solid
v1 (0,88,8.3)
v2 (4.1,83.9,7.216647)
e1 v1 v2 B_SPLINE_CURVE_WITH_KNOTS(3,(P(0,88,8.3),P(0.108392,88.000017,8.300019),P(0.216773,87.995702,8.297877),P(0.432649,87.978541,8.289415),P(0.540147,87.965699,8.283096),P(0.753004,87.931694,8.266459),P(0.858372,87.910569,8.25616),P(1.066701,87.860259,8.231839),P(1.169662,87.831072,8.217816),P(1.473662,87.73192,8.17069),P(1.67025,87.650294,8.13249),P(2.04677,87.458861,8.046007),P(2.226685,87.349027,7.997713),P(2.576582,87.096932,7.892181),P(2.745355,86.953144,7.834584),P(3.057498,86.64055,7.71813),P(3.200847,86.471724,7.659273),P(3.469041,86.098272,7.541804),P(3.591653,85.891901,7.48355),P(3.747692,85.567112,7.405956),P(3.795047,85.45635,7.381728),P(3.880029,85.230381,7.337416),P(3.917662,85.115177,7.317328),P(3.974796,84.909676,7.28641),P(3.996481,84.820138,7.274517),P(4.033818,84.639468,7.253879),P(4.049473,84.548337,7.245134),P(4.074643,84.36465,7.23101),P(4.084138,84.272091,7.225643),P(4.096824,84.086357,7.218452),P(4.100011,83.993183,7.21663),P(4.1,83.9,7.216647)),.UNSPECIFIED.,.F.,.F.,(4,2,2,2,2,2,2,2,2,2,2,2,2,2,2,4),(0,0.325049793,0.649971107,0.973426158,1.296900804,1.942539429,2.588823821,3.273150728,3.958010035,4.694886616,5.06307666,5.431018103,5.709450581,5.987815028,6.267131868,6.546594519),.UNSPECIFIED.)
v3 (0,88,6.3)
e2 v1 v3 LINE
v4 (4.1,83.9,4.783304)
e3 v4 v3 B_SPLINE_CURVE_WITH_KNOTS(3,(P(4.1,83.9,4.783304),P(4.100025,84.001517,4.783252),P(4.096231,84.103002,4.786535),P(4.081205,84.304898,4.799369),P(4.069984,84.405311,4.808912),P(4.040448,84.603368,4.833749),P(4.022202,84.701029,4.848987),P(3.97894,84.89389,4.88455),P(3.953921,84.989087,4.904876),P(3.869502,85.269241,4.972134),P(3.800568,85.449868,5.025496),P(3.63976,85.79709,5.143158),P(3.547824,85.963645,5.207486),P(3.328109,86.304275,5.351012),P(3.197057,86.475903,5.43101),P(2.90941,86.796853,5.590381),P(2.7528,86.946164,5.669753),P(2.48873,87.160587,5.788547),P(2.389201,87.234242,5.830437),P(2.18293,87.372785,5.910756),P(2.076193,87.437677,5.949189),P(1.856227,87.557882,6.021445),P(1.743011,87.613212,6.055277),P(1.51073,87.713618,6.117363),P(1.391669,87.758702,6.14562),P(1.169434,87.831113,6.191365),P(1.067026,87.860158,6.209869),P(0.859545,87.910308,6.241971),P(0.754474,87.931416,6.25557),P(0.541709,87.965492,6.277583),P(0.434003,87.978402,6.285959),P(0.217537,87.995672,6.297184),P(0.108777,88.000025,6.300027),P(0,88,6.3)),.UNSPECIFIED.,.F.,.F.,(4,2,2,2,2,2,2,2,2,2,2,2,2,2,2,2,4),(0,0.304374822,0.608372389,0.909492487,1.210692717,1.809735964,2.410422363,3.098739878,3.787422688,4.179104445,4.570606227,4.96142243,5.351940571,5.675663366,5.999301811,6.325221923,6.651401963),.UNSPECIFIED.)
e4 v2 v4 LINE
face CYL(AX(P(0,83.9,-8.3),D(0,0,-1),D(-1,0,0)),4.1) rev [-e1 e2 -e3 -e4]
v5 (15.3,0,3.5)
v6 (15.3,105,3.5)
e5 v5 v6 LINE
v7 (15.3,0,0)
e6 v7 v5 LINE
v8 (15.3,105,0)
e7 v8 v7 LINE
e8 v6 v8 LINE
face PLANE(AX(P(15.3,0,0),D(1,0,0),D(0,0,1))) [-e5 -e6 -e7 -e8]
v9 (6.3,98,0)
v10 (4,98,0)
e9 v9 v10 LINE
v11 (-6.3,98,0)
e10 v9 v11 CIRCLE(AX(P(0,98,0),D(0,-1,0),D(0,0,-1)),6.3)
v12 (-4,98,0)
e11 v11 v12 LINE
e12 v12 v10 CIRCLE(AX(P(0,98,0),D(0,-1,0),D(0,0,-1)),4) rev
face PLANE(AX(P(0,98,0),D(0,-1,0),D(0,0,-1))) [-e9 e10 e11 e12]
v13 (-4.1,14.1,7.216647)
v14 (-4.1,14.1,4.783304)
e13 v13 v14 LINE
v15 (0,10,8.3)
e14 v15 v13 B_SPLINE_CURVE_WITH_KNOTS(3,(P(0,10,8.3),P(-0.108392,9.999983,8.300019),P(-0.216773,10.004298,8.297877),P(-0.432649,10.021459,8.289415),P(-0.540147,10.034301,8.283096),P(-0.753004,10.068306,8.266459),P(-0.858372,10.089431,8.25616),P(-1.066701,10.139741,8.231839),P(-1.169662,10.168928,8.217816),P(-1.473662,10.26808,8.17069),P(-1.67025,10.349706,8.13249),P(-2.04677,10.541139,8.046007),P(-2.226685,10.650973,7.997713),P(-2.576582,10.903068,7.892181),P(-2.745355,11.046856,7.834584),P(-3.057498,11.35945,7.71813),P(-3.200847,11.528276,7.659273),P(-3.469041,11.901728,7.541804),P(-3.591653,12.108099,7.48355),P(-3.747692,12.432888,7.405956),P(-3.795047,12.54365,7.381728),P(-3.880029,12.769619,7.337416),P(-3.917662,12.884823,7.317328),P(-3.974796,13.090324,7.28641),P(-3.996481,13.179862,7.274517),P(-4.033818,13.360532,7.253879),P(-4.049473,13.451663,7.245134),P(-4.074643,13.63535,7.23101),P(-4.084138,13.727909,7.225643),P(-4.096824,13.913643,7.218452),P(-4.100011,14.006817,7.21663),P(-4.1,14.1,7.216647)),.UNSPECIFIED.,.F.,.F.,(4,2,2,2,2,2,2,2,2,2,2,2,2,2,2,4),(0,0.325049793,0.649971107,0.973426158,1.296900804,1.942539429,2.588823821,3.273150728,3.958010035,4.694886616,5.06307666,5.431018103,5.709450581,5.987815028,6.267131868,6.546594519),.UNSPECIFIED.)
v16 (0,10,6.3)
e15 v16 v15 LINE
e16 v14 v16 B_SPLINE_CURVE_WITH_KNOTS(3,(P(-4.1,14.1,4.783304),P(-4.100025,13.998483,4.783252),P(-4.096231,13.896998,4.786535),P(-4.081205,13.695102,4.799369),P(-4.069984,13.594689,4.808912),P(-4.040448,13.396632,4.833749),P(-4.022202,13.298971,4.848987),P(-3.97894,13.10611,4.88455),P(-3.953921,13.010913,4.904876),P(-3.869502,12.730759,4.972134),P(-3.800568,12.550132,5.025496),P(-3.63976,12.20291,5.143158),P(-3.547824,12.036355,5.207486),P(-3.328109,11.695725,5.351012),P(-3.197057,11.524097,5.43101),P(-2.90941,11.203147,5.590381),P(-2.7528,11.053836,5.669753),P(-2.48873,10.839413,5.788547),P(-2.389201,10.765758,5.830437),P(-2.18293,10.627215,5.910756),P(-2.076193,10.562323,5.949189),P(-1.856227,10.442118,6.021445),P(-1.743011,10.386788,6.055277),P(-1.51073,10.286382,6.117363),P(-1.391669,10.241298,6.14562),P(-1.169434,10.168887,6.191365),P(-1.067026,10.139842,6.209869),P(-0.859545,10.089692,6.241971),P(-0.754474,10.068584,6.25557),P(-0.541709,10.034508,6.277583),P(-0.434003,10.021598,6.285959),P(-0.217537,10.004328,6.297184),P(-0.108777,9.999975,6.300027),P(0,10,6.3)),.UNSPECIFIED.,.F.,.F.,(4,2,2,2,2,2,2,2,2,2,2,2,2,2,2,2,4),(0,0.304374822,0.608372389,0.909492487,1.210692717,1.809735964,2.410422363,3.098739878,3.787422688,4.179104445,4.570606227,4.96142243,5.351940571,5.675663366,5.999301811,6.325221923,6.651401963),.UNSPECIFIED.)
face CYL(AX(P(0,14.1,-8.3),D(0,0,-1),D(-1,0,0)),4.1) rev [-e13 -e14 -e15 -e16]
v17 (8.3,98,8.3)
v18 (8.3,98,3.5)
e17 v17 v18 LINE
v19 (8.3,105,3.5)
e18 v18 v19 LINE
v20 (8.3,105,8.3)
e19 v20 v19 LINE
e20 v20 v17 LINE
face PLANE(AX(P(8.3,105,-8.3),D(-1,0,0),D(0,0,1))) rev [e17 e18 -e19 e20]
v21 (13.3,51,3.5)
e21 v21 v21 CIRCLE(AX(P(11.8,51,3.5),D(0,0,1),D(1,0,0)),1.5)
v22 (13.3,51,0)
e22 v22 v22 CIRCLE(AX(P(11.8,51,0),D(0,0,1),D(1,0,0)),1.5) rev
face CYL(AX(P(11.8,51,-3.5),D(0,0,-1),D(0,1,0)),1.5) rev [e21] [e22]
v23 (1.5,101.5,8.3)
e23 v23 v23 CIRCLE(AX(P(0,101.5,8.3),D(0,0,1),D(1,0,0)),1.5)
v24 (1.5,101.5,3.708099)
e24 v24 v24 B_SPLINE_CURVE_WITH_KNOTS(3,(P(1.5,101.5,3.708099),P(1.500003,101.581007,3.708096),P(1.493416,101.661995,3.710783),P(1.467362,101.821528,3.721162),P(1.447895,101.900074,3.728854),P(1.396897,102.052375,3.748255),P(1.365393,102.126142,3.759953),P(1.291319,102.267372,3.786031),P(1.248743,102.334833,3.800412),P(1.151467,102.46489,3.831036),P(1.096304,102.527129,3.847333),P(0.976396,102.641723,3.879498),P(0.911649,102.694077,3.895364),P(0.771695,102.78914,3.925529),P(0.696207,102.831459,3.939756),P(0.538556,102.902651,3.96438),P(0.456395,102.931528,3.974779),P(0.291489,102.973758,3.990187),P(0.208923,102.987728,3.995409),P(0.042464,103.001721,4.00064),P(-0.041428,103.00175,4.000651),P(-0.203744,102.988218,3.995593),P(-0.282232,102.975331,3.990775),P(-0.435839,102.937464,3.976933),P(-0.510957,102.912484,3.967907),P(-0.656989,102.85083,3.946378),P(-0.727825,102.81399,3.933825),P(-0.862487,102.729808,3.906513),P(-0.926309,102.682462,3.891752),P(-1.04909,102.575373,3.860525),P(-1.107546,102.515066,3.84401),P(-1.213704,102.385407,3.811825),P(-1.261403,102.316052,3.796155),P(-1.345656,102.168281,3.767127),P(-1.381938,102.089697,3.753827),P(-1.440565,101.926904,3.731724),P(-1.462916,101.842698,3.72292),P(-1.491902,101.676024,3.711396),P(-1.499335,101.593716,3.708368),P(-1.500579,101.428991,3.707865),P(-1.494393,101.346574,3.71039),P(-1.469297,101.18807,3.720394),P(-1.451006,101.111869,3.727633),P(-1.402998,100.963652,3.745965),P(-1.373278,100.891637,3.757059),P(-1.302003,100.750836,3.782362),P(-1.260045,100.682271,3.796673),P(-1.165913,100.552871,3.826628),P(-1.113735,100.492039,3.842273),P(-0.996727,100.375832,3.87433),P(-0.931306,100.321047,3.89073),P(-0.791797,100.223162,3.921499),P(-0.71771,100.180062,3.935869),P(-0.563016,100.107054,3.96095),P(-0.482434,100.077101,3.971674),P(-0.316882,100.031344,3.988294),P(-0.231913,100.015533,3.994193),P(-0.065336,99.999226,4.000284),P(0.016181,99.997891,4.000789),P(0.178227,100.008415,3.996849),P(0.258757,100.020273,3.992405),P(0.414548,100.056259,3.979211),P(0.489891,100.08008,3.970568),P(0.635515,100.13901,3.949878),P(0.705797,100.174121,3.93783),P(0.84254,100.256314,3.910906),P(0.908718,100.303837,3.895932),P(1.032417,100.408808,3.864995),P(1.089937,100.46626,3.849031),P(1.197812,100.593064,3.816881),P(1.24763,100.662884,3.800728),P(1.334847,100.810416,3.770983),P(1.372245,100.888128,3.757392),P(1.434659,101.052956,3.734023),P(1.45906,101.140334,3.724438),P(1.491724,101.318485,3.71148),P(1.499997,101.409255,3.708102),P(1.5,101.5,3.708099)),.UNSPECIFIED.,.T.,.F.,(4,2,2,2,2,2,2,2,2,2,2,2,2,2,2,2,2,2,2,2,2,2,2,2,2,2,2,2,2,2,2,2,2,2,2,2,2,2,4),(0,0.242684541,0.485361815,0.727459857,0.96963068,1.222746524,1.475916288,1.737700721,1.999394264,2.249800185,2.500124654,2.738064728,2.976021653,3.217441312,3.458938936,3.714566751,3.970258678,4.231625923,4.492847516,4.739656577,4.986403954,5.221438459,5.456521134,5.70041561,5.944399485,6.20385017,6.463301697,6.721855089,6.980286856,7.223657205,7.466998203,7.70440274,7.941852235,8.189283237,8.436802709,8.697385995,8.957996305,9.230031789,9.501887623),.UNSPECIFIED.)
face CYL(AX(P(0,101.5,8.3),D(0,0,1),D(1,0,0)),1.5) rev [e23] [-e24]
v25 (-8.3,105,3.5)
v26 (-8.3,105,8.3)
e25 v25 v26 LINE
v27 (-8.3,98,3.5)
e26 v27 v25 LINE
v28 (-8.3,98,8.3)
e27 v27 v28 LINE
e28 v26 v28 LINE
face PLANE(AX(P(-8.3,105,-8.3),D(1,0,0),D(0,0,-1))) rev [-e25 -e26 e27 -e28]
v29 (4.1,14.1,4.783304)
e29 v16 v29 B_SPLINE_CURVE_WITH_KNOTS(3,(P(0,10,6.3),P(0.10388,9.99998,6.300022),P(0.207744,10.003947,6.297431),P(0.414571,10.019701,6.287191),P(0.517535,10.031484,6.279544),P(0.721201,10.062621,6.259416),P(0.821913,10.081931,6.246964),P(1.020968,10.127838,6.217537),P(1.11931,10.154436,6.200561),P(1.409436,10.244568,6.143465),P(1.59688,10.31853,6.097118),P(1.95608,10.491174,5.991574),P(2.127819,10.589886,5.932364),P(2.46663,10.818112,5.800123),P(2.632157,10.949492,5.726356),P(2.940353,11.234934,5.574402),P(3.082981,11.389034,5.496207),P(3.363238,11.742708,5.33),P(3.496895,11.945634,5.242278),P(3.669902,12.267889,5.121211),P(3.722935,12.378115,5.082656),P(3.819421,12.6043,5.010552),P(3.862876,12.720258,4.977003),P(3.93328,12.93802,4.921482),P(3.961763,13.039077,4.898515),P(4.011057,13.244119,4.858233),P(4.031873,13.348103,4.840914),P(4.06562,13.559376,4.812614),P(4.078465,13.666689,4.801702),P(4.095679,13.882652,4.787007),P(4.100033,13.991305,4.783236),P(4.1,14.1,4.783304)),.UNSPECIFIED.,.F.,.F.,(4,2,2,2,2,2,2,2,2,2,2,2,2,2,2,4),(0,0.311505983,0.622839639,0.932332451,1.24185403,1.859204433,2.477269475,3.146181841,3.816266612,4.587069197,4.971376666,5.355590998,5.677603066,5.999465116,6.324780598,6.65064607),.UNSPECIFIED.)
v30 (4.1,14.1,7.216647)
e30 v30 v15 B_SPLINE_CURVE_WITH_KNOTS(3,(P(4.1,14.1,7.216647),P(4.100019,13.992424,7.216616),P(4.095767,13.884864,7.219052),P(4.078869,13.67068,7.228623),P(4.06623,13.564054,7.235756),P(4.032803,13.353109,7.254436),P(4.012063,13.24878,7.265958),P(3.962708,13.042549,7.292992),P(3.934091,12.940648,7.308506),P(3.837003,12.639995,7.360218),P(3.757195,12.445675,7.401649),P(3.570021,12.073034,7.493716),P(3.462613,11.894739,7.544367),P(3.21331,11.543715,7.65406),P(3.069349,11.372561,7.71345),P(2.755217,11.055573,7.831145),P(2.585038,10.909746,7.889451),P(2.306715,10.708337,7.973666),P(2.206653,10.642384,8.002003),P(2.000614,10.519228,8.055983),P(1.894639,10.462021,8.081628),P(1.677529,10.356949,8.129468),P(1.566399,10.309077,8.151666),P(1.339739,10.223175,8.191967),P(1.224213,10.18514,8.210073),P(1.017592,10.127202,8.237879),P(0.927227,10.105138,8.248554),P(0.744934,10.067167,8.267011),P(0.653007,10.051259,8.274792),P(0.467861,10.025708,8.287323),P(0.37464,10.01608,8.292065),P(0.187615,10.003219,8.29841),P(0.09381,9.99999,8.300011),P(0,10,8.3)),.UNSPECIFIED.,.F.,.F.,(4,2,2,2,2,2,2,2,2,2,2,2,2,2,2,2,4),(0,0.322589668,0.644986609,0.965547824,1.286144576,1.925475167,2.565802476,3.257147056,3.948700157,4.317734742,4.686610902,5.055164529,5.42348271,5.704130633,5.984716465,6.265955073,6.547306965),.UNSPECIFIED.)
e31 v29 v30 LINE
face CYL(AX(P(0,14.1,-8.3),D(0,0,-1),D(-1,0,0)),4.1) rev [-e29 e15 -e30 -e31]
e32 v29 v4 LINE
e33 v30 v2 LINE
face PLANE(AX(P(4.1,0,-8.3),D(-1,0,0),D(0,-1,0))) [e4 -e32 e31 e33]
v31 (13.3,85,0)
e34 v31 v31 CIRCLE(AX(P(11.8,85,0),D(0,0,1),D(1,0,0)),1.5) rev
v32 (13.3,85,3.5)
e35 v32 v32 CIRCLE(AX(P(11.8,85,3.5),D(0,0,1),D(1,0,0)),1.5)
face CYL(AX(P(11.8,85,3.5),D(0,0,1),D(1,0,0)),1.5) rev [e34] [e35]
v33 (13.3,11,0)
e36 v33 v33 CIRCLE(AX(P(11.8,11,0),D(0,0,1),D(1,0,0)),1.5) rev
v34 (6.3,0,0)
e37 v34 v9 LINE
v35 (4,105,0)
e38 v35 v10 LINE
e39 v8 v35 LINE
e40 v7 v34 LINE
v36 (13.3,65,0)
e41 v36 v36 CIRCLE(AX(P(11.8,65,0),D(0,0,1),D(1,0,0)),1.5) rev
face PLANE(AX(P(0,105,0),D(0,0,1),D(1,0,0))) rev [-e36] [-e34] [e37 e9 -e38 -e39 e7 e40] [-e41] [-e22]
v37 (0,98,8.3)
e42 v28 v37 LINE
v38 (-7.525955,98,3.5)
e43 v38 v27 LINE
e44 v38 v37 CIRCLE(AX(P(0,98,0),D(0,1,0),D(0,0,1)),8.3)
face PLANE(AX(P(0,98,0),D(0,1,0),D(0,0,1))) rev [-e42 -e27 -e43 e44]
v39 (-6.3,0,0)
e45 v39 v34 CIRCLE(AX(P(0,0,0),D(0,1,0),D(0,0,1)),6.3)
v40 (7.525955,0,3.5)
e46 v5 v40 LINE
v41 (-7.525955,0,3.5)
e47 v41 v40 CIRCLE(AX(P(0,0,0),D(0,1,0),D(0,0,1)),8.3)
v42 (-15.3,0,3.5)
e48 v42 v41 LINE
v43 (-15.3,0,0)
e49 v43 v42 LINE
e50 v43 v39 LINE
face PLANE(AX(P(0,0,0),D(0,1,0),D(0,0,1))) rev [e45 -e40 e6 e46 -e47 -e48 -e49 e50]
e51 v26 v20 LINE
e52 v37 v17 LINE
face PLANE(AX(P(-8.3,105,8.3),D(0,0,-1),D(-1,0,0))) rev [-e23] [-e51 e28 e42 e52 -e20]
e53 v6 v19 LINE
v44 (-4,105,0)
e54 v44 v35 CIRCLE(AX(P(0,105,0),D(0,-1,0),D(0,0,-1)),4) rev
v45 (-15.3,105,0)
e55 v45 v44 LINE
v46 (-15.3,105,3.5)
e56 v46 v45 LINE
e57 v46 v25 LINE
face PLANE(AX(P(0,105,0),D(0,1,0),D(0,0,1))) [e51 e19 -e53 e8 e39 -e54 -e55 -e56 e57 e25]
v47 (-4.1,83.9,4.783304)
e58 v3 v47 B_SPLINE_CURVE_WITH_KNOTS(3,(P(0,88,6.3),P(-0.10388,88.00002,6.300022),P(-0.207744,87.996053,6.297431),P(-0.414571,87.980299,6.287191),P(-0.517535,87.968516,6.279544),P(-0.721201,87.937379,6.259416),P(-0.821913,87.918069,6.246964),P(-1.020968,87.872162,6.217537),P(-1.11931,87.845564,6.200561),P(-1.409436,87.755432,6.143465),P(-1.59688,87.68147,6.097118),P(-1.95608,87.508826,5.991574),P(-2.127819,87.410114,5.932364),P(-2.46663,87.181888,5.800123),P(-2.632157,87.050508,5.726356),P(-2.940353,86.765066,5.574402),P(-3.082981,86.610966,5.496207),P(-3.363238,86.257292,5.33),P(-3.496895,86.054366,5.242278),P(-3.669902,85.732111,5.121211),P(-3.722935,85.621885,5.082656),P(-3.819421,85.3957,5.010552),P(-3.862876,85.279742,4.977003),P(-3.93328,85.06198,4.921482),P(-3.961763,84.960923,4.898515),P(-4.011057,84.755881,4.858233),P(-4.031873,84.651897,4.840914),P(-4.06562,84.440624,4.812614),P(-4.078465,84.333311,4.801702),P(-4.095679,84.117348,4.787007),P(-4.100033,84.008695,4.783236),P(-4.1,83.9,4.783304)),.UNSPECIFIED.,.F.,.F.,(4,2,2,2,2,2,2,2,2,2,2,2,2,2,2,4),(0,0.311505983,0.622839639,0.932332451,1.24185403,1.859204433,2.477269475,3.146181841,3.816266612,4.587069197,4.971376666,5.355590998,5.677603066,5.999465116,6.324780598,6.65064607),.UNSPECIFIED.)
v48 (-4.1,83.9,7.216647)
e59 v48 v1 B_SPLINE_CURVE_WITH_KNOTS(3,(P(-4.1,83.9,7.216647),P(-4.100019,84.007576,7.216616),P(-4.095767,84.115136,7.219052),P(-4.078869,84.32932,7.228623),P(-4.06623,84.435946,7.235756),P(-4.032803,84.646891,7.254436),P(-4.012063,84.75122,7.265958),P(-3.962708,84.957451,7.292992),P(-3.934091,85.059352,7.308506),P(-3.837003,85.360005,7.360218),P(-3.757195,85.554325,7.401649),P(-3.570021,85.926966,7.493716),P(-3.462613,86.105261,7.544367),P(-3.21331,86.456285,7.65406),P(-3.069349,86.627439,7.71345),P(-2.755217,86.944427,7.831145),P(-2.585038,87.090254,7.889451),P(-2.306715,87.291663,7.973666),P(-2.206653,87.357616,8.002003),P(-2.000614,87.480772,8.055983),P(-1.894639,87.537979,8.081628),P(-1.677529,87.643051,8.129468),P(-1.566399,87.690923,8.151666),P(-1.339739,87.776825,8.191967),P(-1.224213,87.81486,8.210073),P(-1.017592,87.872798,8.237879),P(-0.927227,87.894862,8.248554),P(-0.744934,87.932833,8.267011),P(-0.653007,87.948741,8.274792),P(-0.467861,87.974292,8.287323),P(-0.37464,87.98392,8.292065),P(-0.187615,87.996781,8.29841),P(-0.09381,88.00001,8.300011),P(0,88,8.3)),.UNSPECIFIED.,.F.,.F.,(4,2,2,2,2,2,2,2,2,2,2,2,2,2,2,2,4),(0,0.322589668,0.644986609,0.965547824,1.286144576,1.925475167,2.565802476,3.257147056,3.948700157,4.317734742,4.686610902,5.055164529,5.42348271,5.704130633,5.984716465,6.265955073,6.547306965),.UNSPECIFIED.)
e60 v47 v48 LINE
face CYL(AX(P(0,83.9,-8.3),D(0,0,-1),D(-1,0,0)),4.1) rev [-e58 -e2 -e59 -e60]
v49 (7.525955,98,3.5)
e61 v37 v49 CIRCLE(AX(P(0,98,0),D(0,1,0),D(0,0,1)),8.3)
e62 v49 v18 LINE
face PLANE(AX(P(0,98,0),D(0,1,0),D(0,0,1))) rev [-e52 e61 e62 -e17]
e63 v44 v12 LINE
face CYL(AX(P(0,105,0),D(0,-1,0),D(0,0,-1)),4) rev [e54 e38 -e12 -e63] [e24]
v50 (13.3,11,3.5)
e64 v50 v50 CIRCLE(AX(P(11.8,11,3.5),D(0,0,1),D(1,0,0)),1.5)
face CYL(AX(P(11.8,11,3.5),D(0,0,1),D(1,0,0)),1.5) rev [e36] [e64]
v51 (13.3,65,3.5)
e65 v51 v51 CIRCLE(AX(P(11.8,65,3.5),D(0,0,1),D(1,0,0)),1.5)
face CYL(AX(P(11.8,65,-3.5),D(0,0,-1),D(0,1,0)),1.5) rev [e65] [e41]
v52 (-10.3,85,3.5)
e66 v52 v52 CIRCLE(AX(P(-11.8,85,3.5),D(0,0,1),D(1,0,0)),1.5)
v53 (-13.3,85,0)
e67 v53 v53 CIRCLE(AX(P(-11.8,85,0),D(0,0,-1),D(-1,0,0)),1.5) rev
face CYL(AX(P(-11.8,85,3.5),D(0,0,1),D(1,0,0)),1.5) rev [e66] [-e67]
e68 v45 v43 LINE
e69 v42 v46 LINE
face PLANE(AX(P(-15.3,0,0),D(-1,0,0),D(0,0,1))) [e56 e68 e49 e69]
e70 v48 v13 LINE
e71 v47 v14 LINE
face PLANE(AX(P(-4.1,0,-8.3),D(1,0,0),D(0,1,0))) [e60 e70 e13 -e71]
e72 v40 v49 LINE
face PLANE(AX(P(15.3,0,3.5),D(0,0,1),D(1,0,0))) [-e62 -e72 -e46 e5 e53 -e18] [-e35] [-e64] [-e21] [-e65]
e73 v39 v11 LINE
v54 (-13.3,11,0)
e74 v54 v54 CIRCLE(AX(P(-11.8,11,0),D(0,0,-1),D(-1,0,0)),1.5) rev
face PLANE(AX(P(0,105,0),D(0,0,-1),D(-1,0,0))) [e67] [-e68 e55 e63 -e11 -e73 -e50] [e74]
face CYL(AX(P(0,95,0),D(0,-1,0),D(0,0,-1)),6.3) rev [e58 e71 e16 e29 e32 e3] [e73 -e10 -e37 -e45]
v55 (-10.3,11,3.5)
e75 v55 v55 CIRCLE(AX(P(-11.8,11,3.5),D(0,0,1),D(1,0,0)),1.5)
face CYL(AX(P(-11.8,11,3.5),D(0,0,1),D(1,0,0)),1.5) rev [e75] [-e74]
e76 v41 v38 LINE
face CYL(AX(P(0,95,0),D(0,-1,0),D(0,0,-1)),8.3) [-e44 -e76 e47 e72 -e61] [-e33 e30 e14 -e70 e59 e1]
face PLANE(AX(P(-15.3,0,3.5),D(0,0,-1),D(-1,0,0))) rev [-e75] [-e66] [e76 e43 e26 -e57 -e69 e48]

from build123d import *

# Parameters (mm, degrees)
SKETCH1_R                = 8.3
SKETCH1_R_2              = 6.3
BOSS_EXTRUDE1_DEPTH      = 95
SKETCH3_R                = 8.3
BOSS_EXTRUDE2_DEPTH      = 3
SKETCH5_W                = 16.6
SKETCH5_H                = 16.6
BOSS_EXTRUDE4_DEPTH      = 7
CUT_EXTRUDE1_DEPTH       = 107.627623063
FILLET1_R                = 4.1
SKETCH4_R                = 6.3
SKETCH4_R_2              = 1.5
CUT_EXTRUDE3_DEPTH       = 3
BOSS_EXTRUDE6_START      = 2
SKETCH8_R                = 1.5
BOSS_EXTRUDE6_DEPTH      = 2
BOSS_EXTRUDE7_START      = -0.774045
BOSS_EXTRUDE7_DEPTH      = 7.774045
F_3_0_3_DIAMETER_HOLE1_D = 3
F_3_0_3_DIAMETER_HOLE2_D = 3
F_3_0_3_DIAMETER_HOLE3_D = 3
CUT_EXTRUDE4_START       = -105
CUT_EXTRUDE4_DEPTH       = 105


# Read off the part's stored shape, not the designer's step: Cut-Extrude4
with BuildPart() as part:
    # Sketch1 → Boss-Extrude1 (new body)
    with BuildSketch(Plane(origin=(0, 0, 0), x_dir=(1, 0, 0), z_dir=(0, 1, 0))):
        with Locations(Location((0, 0, 0), (0, 0, 270))):
            Circle(SKETCH1_R)
        with Locations(Location((0, 0, 0), (0, 0, 270))):
            Circle(SKETCH1_R_2, mode=Mode.SUBTRACT)
    extrude(amount=BOSS_EXTRUDE1_DEPTH)

    # Sketch3 → Boss-Extrude2 (add)
    with BuildSketch(Plane(origin=(0, 95, 0), x_dir=(1, 0, 0), z_dir=(0, 1, 0))):
        with Locations(Location((0, 0, 0), (0, 0, 270))):
            Circle(SKETCH3_R)
    extrude(amount=BOSS_EXTRUDE2_DEPTH)

    # Sketch5 → Boss-Extrude4 (add)
    with BuildSketch(Plane(origin=(0, 98, 0), x_dir=(1, 0, 0), z_dir=(0, 1, 0))):
        Rectangle(SKETCH5_W, SKETCH5_H)
    extrude(amount=BOSS_EXTRUDE4_DEPTH)

    # Sketch6 → Cut-Extrude1 (cut, through all)
    with BuildSketch(Plane.XY.offset(8.3)):
        Polygon((4.1, 10), (0, 10), (-4.1, 10), (-4.1, 88), (4.1, 88), align=None)
    extrude(amount=-CUT_EXTRUDE1_DEPTH, mode=Mode.SUBTRACT)

    # Fillet1
    fillet1_edges = [part.edges().sort_by_distance(p)[0] for p in [
        (4.1, 88, 5.999975859),
        (4.1, 88, -5.999975859),
        (-4.1, 88, 5.999975859),
        (-4.1, 88, -5.999975859),
        (4.1, 10, -5.999975859),
        (4.1, 10, 5.999975859),
        (-4.1, 10, -5.999975859),
        (-4.1, 10, 5.999975859),
    ]]
    fillet(fillet1_edges, radius=FILLET1_R - 0.0001)  # a hair under: the kernel refuses the full size

    # Sketch4 → Cut-Extrude3 (cut)
    with BuildSketch(Plane(origin=(0, 95, 0), x_dir=(-1, 0, 0), z_dir=(0, -1, 0))):
        with Locations(Location((0, 0, 0), (0, 0, 90))):
            Circle(SKETCH4_R)
        with Locations(Location((0, 0, 0), (0, 0, 90))):
            Circle(SKETCH4_R_2, mode=Mode.SUBTRACT)
    extrude(amount=-CUT_EXTRUDE3_DEPTH, mode=Mode.SUBTRACT)

    # Sketch8 → Boss-Extrude6 (add)
    with BuildSketch(Plane(origin=(0, 95, 0), x_dir=(-1, 0, 0), z_dir=(0, -1, 0)).offset(BOSS_EXTRUDE6_START)):
        with Locations(Location((0, 0, 0), (0, 0, 90))):
            Circle(SKETCH8_R)
    extrude(amount=-BOSS_EXTRUDE6_DEPTH)

    # Sketch9 → Boss-Extrude7 (add)
    with BuildSketch(Plane.ZY.offset(8.3).offset(BOSS_EXTRUDE7_START)):
        Polygon((0, 0), (3.5, 0), (3.5, 105), (-3.5, 105), (-3.5, 0), align=None)
    boss_extrude7 = extrude(amount=BOSS_EXTRUDE7_DEPTH)

    # Mirror1: Boss-Extrude7 across plane
    add(boss_extrude7.mirror(Plane(origin=(0, 0, 0), x_dir=(0, 0, 1), z_dir=(1, 0, 0))))

    # Ø3.0 (3) Diameter Hole1 (through all)
    with Locations(Plane.XY.offset(8.3)):
        with Locations((0, 101.5)):
            Hole(F_3_0_3_DIAMETER_HOLE1_D / 2)

    # Ø3.0 (3) Diameter Hole2 (through all)
    with Locations(Plane.XY.offset(3.5)):
        with Locations((11.8, 85), (11.8, 11)):
            f_3_0_3_diameter_hole2 = Hole(F_3_0_3_DIAMETER_HOLE2_D / 2)

    # Ø3.0 (3) Diameter Hole3 (through all)
    with Locations(Plane(origin=(0, 0, -3.5), x_dir=(-1, 0, 0), z_dir=(0, 0, -1))):
        with Locations((-11.8, 65), (-11.8, 51)):
            Hole(F_3_0_3_DIAMETER_HOLE3_D / 2)

    # Mirror2: Ø3.0 (3) Diameter Hole2 across plane
    add(f_3_0_3_diameter_hole2.mirror(Plane(origin=(0, 0, 0), x_dir=(0, 0, 1), z_dir=(1, 0, 0))), mode=Mode.SUBTRACT)

    # Cut-Extrude4 outline → Cut-Extrude4 (cut)
    with BuildSketch(Plane(origin=(0, 0, 0), x_dir=(-1, 0, 0), z_dir=(0, -1, 0)).offset(CUT_EXTRUDE4_START)):
        with BuildLine():
            ThreePointArc((-4, 0), (0, -4), (4, 0))
            Line((4, 0), (15.3, 0))
            Line((15.3, 0), (15.3, 3.5))
            Line((15.3, 3.5), (8.3, 3.5))
            Line((8.3, 3.5), (8.3, 8.3))
            Line((8.3, 8.3), (-8.3, 8.3))
            Line((-8.3, 8.3), (-8.3, 3.5))
            Line((-8.3, 3.5), (-15.3, 3.5))
            Line((-15.3, 3.5), (-15.3, 0))
            Line((-15.3, 0), (-4, 0))
        make_face()
    extrude(amount=CUT_EXTRUDE4_DEPTH, mode=Mode.SUBTRACT)


solid = part.part
